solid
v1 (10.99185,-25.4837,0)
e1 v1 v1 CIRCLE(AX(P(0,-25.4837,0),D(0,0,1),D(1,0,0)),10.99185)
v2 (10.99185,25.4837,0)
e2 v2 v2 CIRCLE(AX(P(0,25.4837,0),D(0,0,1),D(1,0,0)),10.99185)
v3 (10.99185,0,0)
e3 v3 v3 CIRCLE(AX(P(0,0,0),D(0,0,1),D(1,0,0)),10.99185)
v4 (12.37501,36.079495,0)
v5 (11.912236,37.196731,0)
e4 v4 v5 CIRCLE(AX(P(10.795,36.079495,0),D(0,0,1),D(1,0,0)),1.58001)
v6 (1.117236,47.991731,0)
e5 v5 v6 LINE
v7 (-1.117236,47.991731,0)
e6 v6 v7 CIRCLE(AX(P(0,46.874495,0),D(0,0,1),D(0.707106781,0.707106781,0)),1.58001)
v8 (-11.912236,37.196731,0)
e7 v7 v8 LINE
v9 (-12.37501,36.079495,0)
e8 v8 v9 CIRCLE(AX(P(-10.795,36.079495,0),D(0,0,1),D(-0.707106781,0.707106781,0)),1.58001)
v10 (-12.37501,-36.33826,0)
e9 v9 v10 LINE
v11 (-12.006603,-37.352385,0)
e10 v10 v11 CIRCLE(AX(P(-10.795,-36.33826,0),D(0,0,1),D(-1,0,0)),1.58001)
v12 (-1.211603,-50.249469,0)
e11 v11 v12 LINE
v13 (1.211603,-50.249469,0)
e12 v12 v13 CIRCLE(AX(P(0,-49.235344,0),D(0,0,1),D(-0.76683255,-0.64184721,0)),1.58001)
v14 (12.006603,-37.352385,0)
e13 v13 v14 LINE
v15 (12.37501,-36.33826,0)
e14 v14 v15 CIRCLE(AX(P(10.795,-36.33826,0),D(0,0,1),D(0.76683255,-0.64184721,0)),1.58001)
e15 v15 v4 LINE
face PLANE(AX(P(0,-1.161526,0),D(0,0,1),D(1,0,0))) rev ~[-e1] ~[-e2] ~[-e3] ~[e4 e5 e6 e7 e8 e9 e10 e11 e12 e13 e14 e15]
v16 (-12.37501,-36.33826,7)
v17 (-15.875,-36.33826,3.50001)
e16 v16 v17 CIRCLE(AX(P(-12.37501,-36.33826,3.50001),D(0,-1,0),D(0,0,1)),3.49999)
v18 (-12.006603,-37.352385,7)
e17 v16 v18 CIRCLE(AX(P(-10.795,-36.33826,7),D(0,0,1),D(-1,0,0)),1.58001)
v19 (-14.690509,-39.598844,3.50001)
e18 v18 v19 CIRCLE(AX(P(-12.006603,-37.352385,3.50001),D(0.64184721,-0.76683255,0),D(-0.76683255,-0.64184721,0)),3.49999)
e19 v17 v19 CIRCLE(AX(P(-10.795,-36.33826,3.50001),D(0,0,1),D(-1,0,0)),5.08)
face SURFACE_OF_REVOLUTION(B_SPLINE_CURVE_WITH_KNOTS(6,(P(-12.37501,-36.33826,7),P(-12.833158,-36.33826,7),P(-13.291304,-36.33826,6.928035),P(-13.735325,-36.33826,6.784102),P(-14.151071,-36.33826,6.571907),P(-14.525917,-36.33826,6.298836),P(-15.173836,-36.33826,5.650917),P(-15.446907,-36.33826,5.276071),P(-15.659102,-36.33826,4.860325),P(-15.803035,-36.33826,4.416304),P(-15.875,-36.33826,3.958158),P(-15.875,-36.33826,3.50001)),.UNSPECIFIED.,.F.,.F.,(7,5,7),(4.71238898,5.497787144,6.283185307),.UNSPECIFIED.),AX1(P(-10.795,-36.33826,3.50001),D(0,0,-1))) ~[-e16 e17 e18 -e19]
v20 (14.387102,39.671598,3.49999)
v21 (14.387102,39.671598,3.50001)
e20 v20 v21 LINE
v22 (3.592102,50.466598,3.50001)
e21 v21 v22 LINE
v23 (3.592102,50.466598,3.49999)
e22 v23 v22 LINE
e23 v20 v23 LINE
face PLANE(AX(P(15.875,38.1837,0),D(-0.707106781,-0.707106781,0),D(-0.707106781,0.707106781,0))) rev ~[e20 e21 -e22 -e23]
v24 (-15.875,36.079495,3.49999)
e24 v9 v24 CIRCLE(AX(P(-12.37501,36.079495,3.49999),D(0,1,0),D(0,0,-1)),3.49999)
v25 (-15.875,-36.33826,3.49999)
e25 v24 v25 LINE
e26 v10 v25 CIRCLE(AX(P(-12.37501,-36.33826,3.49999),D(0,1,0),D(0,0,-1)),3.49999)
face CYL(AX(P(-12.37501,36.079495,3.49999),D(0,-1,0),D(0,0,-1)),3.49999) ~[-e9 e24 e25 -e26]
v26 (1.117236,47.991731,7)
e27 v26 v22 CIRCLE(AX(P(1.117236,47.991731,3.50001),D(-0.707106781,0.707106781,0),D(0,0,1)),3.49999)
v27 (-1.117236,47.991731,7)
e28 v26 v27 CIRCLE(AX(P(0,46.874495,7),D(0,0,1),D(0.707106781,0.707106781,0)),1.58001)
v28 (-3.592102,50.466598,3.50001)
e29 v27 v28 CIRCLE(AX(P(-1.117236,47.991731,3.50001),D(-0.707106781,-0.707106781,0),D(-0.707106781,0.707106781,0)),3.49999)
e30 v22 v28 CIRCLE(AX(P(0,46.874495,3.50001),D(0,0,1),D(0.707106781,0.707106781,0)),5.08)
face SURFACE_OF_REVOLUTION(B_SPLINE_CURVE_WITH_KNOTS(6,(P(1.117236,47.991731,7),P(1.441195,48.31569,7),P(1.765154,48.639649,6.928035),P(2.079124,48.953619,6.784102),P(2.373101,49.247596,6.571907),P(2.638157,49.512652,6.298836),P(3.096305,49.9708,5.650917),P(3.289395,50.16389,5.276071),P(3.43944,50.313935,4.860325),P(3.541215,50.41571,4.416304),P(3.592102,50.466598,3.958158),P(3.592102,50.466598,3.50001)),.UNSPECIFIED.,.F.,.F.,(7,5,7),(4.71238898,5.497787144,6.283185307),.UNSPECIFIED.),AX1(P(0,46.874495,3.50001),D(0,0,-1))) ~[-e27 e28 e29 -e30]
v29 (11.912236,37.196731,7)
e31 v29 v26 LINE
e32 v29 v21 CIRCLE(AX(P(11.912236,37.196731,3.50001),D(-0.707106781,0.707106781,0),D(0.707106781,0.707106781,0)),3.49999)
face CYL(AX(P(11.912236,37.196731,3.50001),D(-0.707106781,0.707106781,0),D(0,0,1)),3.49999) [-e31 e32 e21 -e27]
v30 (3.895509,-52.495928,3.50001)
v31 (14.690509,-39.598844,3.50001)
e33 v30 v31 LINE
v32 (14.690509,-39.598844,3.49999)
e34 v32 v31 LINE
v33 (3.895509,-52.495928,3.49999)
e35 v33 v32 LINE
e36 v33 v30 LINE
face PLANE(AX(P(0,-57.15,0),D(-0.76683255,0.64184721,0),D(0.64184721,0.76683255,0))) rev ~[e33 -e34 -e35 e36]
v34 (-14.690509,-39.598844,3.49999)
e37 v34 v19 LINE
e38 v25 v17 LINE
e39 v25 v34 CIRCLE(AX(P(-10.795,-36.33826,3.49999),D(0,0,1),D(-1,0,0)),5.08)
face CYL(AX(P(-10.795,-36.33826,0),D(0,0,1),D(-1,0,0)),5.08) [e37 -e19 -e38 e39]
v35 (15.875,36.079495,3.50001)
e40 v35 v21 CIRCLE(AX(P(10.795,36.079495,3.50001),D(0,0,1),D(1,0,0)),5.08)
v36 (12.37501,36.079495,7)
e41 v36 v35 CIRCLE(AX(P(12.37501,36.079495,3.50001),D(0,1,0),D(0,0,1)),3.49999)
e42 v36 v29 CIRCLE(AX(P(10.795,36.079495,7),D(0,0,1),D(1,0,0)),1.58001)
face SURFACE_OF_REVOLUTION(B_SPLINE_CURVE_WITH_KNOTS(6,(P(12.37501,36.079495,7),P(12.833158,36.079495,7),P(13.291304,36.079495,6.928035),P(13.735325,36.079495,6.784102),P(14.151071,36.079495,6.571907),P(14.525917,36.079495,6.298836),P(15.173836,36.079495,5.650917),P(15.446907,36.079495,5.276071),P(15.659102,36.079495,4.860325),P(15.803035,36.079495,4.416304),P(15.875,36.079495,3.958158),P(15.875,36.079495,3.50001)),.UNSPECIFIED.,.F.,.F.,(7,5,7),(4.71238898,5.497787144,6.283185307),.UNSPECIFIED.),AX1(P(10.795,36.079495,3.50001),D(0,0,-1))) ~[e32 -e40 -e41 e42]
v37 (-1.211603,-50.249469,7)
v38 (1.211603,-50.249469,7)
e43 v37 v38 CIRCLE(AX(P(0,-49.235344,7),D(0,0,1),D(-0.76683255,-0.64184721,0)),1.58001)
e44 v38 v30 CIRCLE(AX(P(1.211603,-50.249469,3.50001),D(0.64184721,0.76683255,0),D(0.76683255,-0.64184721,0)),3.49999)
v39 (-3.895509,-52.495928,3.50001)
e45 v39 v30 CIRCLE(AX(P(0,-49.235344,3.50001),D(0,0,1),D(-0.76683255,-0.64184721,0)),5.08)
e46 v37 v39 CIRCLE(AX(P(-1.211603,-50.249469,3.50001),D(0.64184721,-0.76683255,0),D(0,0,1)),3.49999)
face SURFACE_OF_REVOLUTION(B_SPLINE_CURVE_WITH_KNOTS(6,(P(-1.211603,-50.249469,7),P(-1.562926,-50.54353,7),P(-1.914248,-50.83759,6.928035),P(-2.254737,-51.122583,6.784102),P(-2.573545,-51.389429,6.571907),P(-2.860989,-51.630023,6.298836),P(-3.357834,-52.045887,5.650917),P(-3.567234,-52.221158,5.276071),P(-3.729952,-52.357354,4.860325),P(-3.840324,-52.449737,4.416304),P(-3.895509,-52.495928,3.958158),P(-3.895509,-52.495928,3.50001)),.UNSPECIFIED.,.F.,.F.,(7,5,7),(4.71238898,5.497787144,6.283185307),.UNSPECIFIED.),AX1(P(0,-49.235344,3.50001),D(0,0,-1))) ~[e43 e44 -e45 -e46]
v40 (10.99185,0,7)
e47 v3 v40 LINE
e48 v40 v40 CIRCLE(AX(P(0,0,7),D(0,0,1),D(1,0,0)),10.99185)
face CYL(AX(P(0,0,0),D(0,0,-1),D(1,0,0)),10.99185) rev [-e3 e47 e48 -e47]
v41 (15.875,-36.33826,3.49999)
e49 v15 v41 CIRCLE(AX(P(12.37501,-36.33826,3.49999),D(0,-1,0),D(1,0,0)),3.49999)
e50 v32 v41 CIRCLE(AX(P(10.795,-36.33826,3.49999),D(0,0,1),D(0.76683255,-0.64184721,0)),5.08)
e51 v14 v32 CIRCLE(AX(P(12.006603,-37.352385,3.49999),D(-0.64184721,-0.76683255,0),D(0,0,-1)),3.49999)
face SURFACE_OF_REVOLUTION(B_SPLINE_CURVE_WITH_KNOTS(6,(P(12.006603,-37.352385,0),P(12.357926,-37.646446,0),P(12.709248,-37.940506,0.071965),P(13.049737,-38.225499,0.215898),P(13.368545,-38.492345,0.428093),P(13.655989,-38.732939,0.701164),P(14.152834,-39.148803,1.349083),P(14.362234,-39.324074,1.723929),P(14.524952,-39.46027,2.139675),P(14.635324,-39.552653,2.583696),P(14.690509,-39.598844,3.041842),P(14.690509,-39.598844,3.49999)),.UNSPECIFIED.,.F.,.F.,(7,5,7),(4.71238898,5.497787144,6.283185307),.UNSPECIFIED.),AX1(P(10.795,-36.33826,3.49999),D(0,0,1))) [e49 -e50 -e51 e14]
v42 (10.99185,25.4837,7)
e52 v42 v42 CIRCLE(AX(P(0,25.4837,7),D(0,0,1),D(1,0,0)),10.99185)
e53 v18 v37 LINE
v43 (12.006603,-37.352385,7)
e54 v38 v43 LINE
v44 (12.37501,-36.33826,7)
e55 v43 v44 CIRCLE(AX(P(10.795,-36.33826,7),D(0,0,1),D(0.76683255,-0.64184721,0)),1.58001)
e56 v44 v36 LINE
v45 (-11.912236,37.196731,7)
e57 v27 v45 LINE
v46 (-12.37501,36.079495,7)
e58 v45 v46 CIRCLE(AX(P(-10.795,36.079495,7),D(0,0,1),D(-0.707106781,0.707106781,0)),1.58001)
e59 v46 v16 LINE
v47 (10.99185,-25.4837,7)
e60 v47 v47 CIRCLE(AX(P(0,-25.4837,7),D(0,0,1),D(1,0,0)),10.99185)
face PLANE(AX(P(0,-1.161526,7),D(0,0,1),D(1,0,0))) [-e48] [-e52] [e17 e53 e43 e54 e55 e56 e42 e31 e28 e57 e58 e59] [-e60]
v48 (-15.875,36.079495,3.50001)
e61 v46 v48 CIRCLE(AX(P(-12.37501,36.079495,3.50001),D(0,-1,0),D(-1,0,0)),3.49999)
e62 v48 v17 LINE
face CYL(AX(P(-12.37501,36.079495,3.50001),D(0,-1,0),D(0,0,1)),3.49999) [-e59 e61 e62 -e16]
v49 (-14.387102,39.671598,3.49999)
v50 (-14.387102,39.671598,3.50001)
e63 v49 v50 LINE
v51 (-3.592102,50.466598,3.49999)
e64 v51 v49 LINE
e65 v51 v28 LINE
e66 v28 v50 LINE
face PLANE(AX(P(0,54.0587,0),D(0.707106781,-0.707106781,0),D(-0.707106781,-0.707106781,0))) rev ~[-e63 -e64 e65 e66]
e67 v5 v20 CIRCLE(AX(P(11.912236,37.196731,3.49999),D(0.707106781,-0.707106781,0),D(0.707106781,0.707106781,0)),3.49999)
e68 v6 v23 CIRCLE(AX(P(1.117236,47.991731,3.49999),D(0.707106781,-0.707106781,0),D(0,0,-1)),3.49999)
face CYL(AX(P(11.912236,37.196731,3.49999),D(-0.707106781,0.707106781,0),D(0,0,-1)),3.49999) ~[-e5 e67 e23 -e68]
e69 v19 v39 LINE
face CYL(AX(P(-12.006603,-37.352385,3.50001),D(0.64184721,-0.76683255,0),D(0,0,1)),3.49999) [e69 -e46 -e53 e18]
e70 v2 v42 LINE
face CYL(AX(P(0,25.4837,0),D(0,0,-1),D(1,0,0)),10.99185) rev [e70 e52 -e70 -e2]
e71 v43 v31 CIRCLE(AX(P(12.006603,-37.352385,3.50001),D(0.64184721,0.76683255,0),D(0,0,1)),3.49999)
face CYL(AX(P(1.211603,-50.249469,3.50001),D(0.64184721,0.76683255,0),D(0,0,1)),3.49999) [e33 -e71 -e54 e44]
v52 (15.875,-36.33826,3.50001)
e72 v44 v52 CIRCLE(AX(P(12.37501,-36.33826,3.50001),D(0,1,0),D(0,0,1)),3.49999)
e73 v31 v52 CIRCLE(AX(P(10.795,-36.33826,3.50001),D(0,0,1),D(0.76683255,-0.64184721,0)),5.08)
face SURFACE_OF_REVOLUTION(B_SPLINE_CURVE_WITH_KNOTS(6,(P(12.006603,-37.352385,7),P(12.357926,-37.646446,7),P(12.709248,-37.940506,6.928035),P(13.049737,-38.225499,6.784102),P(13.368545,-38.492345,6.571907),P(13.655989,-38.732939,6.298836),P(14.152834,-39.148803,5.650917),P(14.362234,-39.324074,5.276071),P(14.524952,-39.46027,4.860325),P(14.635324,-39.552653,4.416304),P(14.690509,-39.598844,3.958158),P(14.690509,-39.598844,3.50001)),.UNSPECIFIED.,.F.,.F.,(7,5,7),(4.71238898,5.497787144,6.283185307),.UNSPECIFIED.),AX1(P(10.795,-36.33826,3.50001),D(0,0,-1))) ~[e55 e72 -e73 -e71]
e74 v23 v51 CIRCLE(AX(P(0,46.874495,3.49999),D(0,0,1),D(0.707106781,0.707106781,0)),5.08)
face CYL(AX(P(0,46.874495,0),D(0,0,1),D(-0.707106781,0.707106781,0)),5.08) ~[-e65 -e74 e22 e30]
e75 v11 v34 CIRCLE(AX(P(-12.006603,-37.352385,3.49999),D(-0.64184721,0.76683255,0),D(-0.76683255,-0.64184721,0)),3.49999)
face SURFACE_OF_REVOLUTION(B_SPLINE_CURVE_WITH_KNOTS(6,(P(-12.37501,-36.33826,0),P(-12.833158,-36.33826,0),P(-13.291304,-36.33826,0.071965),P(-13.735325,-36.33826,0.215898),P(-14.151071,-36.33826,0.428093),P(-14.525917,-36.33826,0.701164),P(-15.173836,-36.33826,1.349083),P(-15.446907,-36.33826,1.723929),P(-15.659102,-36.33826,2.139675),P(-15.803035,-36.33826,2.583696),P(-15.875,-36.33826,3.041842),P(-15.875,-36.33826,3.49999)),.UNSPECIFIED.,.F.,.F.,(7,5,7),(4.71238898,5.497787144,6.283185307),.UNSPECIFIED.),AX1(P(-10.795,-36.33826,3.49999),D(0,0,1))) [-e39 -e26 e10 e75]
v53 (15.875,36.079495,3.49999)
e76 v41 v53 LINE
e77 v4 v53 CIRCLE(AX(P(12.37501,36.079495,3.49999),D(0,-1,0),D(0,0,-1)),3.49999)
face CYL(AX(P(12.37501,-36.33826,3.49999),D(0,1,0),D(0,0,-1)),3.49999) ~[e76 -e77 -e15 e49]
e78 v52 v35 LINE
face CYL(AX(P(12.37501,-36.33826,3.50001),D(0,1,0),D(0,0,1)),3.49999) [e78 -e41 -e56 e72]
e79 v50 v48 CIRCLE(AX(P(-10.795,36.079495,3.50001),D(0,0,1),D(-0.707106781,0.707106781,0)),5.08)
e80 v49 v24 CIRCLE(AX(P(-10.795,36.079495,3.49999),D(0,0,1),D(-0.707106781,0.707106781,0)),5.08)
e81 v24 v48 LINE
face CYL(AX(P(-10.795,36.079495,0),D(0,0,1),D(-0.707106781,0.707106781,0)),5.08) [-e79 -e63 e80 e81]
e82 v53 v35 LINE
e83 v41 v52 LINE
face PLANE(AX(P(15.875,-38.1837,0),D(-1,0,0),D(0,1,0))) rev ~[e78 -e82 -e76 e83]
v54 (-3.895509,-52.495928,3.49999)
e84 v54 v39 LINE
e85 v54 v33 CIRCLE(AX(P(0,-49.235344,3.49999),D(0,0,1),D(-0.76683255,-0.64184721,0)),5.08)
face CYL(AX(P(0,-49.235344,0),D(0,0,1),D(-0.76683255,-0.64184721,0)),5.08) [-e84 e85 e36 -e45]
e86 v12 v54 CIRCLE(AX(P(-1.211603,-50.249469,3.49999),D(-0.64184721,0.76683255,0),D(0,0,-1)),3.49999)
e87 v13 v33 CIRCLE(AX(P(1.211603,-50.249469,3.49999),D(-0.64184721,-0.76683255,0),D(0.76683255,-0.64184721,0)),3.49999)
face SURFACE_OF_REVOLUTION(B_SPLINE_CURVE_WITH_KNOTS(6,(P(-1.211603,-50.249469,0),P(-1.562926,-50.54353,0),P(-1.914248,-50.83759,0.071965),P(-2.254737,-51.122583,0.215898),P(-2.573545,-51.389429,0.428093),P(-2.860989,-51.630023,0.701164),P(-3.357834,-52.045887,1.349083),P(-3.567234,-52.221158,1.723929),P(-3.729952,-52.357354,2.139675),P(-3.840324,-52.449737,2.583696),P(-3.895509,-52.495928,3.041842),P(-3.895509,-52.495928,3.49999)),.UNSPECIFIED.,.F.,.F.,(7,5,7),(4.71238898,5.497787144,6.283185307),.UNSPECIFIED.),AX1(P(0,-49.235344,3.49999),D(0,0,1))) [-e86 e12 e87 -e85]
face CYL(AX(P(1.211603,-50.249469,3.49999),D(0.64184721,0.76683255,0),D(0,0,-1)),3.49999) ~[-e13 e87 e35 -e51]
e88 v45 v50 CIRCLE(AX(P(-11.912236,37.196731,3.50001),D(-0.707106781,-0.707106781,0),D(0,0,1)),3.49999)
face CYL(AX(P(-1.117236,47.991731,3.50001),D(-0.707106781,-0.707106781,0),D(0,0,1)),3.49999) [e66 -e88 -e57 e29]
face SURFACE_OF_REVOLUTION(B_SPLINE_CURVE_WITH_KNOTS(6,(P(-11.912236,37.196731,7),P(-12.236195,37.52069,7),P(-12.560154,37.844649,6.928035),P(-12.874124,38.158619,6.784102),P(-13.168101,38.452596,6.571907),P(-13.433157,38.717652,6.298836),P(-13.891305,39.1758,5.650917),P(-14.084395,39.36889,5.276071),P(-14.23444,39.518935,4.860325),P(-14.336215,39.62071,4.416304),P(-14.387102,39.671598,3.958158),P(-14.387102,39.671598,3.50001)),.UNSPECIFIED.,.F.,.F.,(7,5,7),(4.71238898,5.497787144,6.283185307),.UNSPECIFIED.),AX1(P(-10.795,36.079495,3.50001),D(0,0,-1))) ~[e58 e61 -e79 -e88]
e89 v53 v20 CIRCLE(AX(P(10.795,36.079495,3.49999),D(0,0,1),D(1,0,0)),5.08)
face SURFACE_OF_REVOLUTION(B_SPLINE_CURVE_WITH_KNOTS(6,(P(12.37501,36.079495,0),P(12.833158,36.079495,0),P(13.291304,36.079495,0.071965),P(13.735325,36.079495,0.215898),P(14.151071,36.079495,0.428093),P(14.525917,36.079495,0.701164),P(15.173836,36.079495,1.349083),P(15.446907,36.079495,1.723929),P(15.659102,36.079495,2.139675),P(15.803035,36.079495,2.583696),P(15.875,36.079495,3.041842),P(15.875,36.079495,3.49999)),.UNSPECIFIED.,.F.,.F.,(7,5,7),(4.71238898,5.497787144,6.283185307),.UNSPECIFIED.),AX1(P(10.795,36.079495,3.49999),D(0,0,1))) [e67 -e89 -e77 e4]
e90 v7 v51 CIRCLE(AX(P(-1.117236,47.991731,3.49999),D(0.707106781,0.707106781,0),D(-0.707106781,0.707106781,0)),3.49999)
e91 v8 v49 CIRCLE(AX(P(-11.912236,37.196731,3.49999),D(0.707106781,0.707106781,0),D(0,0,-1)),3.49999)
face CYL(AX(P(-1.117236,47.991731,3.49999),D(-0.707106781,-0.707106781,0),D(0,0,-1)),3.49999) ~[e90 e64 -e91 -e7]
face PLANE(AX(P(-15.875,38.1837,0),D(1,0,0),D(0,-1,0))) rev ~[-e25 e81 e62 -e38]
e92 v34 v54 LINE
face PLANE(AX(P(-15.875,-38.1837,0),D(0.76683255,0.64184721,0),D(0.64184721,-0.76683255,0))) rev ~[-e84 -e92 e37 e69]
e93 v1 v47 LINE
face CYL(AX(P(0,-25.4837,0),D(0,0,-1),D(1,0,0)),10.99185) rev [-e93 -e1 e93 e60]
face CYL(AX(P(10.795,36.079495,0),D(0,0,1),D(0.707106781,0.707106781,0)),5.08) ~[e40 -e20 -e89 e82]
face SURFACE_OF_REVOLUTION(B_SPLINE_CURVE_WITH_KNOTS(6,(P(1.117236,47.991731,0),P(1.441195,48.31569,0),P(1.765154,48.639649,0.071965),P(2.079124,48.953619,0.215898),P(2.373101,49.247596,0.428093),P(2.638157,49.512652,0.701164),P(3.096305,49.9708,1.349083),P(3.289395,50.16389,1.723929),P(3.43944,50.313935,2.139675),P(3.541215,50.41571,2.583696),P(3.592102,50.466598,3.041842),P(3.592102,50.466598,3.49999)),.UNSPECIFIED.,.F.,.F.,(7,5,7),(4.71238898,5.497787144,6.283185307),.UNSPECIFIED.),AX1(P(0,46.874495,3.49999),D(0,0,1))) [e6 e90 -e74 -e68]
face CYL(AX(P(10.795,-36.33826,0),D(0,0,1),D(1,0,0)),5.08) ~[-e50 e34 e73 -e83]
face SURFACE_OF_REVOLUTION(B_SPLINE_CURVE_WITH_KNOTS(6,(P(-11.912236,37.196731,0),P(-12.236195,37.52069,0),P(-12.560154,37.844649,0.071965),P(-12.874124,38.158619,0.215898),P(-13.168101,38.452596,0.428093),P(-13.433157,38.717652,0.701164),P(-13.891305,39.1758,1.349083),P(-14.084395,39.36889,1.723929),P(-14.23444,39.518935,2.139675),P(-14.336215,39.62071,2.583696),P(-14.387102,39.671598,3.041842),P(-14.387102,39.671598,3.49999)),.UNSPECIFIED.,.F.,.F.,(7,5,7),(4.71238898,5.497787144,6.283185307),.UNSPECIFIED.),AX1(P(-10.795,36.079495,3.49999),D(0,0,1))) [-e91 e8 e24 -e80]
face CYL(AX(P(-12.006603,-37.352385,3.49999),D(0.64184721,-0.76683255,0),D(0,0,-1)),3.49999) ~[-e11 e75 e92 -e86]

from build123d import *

# Parameters (mm, degrees)
F1_R     = 10.99185
F2_DEPTH = 7
F3_R     = 5.08
F4_R     = 3.49999


# Not quite as in the source:
# - a fillet or chamfer is up to 0.001 mm smaller than in the source, because OpenCascade refuses the exact size


with BuildPart() as f2:
    # F1 (on Top) → F2 (new body)
    with BuildSketch(Plane.XY):
        Polygon((0, 54.0587), (-15.875, 38.1837), (-15.875, -38.1837), (0, -57.15), (15.875, -38.1837), (15.875, 38.1837), align=None)
        with Locations((0, -25.4837)):
            Circle(F1_R, mode=Mode.SUBTRACT)
        Circle(F1_R, mode=Mode.SUBTRACT)
        with Locations((0, 25.4837)):
            Circle(F1_R, mode=Mode.SUBTRACT)
    extrude(amount=F2_DEPTH)

    # F3
    f3_edges = [f2.edges().sort_by_distance(p)[0] for p in [
        (-15.875, -38.1837, 3.5),
        (0, -57.15, 3.5),
        (15.875, -38.1837, 3.5),
        (15.875, 38.1837, 3.5),
        (0, 54.0587, 3.5),
        (-15.875, 38.1837, 3.5),
    ]]
    fillet(f3_edges, radius=F3_R)

    # F4 (radius 3.5 in the source; OpenCascade refuses exactly that, so slightly less here)
    f4_edges = [f2.edges().sort_by_distance(p)[0] for p in [
        (-15.875, -0.129382, 0),
        (15.875, -0.129382, 7),
    ]]
    fillet(f4_edges, radius=F4_R)


solid = f2.part
